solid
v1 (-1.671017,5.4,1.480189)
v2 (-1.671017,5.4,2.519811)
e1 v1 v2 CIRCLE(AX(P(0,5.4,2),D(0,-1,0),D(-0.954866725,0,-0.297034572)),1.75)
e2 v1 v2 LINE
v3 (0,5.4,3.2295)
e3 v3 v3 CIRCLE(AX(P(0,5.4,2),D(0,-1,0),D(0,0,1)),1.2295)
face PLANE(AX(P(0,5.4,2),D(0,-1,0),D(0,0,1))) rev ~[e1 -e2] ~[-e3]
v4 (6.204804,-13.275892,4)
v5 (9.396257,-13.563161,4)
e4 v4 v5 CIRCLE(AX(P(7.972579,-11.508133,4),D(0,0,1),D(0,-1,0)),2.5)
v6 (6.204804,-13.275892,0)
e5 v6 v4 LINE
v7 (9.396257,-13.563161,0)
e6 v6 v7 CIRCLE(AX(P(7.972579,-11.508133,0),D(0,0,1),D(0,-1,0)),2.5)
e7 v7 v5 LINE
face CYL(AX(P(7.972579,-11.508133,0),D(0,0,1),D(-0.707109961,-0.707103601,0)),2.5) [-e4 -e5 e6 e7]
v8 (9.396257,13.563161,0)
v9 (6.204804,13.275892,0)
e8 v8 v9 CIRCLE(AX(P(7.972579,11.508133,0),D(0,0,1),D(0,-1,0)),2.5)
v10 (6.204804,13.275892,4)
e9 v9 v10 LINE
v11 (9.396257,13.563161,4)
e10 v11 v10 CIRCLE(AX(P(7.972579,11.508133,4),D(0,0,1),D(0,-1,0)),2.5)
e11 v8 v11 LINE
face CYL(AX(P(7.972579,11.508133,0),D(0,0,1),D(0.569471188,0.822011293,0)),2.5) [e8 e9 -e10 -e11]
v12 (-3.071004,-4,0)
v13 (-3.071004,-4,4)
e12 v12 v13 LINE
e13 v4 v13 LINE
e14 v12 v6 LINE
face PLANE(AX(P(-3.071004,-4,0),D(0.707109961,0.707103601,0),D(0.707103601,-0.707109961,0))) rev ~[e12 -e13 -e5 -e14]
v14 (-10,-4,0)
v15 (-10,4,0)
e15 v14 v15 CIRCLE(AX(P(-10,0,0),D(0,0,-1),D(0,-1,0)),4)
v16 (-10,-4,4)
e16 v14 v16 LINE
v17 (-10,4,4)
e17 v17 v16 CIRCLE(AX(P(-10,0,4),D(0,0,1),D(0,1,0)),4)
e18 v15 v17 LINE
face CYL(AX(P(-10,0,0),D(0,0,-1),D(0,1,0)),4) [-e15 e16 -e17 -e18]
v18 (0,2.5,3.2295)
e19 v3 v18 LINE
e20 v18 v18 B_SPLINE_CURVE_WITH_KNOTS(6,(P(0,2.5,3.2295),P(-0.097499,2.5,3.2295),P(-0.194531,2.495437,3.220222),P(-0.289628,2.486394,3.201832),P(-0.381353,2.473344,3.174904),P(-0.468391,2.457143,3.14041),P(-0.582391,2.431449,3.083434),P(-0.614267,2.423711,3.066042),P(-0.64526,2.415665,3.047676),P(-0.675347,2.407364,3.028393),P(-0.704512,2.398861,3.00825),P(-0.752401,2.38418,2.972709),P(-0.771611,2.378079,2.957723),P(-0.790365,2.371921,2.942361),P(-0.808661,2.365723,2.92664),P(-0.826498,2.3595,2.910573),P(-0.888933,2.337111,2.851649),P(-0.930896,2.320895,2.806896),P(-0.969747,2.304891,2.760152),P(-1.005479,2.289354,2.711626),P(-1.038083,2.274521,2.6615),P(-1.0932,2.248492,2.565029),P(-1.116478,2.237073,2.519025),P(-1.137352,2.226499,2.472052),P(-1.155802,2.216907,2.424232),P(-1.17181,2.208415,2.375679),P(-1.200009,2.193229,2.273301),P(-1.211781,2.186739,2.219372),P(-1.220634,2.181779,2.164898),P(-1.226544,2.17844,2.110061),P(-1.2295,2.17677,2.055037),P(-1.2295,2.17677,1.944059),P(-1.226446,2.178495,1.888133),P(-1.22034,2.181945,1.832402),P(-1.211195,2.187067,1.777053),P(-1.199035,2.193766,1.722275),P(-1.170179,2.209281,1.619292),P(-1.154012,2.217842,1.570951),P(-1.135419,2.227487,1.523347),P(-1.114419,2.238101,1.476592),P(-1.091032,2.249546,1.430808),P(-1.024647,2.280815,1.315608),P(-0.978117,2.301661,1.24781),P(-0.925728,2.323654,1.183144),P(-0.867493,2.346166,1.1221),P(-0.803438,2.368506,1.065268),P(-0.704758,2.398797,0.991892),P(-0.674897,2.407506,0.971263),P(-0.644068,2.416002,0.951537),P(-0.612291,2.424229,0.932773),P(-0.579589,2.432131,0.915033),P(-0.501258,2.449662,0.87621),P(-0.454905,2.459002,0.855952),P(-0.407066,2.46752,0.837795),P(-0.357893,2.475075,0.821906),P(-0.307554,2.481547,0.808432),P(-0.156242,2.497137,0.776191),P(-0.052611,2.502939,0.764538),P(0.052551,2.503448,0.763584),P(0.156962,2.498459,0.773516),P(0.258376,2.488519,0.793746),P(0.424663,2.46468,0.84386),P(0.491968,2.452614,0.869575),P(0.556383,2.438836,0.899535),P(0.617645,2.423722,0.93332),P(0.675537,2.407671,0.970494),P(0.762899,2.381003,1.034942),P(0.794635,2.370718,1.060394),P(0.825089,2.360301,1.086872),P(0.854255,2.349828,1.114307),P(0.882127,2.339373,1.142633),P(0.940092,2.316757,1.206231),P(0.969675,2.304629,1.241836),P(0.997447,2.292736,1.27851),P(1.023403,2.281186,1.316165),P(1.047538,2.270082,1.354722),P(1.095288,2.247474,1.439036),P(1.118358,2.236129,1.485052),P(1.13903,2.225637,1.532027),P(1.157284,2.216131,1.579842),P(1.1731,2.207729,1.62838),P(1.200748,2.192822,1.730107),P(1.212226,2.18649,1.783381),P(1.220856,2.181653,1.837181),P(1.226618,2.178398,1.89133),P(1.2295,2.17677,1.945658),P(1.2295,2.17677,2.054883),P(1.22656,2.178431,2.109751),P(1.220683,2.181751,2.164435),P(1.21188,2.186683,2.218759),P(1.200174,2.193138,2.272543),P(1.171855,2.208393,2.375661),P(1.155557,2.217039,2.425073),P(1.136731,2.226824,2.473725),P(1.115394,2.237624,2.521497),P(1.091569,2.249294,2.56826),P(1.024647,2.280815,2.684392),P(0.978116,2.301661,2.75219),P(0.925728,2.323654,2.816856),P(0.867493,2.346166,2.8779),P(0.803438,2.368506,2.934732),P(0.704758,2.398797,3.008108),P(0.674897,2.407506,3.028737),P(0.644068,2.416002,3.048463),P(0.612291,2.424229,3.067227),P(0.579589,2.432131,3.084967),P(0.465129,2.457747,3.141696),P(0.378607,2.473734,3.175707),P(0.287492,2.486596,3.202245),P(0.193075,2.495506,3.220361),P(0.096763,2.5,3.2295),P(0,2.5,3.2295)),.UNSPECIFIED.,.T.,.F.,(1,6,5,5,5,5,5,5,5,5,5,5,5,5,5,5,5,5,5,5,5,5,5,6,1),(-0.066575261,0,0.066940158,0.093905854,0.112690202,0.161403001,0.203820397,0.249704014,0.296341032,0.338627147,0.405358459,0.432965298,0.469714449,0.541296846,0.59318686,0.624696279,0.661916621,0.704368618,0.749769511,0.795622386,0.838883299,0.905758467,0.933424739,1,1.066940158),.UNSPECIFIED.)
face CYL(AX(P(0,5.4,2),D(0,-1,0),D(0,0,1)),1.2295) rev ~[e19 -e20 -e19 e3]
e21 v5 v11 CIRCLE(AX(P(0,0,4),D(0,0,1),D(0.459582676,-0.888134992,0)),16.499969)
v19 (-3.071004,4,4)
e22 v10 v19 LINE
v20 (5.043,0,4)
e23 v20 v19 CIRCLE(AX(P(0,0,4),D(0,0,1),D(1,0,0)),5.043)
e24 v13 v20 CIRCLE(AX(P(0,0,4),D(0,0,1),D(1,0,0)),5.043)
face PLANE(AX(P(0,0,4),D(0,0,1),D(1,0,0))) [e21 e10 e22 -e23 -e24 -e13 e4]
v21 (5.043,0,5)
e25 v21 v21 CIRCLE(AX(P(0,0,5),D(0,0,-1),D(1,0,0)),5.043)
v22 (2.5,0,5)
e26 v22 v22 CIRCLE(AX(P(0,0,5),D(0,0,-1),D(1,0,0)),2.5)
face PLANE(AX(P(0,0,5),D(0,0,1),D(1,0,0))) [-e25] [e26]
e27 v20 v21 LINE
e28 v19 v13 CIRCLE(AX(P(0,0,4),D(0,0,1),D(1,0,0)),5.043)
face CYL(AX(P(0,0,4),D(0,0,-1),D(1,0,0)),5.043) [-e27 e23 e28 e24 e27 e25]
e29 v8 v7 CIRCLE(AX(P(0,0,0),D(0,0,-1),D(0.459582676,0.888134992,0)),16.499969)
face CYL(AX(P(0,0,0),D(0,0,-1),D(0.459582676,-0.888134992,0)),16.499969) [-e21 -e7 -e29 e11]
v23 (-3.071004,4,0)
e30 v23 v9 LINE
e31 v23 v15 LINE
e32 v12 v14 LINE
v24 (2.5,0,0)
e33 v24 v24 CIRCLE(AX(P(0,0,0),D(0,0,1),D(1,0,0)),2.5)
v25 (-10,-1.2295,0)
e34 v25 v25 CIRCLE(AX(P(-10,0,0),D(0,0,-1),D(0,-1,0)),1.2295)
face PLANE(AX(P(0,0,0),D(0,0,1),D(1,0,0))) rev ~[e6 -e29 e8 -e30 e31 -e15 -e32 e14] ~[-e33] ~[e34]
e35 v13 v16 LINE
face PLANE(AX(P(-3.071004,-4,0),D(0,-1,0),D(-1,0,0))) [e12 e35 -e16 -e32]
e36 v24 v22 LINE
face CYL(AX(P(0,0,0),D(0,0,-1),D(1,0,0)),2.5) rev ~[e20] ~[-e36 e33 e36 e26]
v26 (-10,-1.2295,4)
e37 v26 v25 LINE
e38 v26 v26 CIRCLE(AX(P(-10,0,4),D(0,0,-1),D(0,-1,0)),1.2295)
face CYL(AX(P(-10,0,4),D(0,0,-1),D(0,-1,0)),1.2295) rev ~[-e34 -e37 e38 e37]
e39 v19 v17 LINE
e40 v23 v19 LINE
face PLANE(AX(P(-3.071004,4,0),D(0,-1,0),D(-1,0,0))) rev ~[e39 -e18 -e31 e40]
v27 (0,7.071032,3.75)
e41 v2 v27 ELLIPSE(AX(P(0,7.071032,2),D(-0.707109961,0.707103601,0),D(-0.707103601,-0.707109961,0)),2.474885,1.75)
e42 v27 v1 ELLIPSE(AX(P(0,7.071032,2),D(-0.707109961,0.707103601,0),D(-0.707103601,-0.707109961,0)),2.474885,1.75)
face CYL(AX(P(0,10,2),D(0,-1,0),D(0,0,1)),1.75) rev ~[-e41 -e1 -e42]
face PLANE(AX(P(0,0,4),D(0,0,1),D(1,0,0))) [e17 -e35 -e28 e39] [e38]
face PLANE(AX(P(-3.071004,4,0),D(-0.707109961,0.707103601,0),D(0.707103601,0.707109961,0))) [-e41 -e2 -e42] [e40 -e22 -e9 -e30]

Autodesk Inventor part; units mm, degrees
ref_plane "YZ Plane" through (0, 0, 0) normal (1, 0, 0) x (0, 1, 0)
ref_plane "XZ Plane" through (0, 0, 0) normal (0, 1, 0) x (-1, 0, 0)
sketch "Skizze1" plane through (0, 0, 0) normal (0, 0, 1) x (1, 0, 0)
  line L0 (0, -20.5159) -> (0, 20.5159) projected
  line L1 (-20.1, 0) -> (22.6, 0) projected
  circle A0 centre (0, 0) radius 2.5
  arc A1 (-3, 4) -> (-3, -4) centre (0, 0) ccw
  arc A2 (7.5831, -14.6542) -> (7.5831, 14.6542) centre (0, 0) ccw
  line L2 (-3.5355, 3.5355) -> (7.5831, 14.6542)
  line L3 (-3.5355, -3.5355) -> (7.5831, -14.6542)
  line L4 (-3, 4) -> (-10, 4)
  line L5 (-3, -4) -> (-10, -4)
  arc A3 (-10, 4) -> (-10, -4) centre (-10, 0) ccw
  dimension "d0" = 5
  dimension "d1" = 10
  dimension "d3" = 33
  dimension "d4" = 90
  dimension "d5" = 4
  dimension "d6" = 10
extrude "Extrusion1" add sketch "Skizze1" along normal blind 4 contours L3 L5 A1 L1 A0 L0 | L0 A0 L1 A2 L3 | L5 A3 L1 A1 L3 | L3 A1 L5 | L1 A1 L4 L2 L0 A0 | A0 L0 L2 A2 L1 | L1 A3 L4 L2 A1 | L2 L4 A1
fillet "Rundung1" radius 2.5 2 edges at (7.5831, 14.6542, 2) (7.5831, -14.6542, 2)
sketch "Skizze2" plane through (0, 0, 4) normal (0, 0, 1) x (1, 0, 0)
  arc A0 (-10, 4) -> (-10, -4) centre (-10, 0) ccw projected
  line L0 (0, -20.5159) -> (0, 20.5159) projected
  point P0 (0, 0)
hole "Bohrung1" at (-10, 0, 4) direction (0, 0, -1) diameter 2.459 end through all thread size "M3x0.5" class "6H" standard "ISO Metric profile"
sketch "Skizze3" plane through (0, 0, 4) normal (0, 0, 1) x (1, 0, 0)
  line L0 (0, -20.5159) -> (0, 20.5159) projected
  line L1 (-20.1, 0) -> (22.6, 0) projected
  line L2 (-10, -4) -> (-3.0711, -4) projected
  circle A0 centre (0, 0) radius 5.043
  circle A1 centre (0, 0) radius 2.5
  dimension "d17" = 5
extrude "Extrusion2" add sketch "Skizze3" along normal blind 1 contours A0 L1 A1 L0 | L0 A1 L1 A0 | L1 A1 L0 A0 | L1 A0 L0 A1
ref_plane "Arbeitsebene1" through (0, 10, 0) normal (0, 1, 0) x (-1, 0, 0)
sketch "Skizze7" plane through (0, 10, 0) normal (0, 1, 0) x (-1, 0, 0)
  line L0 (0, -0.8) -> (0, 4.8) projected
  line L1 (15, 0) -> (-2.5, 0) projected
  line L2 (10, 0) -> (10, 4) projected
  point P0 (0, 0)
  point P1 (0, 2)
  dimension "d30" = 2
hole "Bohrung3" at (0, 10, 2) direction (0, -1, 0) diameter 3.5 depth 4.6
sketch "Skizze8" plane through (0, 5.4, 2) normal (0, 1, 0) x (1, 0, 0)
  line L0 (0, 3) -> (0, -4) projected
  line L1 (22.6, 2) -> (-20.1, 2) projected
  point P0 (0, 2)
  point P1 (0, 0)
  dimension "d38" = 2
hole "Bohrung4" at (0, 5.4, 2) direction (0, -1, 0) diameter 2.459 end up to surface thread size "M3x0.5" class "6H" standard "ISO Metric profile"
properties part number "Kurbel 19"
